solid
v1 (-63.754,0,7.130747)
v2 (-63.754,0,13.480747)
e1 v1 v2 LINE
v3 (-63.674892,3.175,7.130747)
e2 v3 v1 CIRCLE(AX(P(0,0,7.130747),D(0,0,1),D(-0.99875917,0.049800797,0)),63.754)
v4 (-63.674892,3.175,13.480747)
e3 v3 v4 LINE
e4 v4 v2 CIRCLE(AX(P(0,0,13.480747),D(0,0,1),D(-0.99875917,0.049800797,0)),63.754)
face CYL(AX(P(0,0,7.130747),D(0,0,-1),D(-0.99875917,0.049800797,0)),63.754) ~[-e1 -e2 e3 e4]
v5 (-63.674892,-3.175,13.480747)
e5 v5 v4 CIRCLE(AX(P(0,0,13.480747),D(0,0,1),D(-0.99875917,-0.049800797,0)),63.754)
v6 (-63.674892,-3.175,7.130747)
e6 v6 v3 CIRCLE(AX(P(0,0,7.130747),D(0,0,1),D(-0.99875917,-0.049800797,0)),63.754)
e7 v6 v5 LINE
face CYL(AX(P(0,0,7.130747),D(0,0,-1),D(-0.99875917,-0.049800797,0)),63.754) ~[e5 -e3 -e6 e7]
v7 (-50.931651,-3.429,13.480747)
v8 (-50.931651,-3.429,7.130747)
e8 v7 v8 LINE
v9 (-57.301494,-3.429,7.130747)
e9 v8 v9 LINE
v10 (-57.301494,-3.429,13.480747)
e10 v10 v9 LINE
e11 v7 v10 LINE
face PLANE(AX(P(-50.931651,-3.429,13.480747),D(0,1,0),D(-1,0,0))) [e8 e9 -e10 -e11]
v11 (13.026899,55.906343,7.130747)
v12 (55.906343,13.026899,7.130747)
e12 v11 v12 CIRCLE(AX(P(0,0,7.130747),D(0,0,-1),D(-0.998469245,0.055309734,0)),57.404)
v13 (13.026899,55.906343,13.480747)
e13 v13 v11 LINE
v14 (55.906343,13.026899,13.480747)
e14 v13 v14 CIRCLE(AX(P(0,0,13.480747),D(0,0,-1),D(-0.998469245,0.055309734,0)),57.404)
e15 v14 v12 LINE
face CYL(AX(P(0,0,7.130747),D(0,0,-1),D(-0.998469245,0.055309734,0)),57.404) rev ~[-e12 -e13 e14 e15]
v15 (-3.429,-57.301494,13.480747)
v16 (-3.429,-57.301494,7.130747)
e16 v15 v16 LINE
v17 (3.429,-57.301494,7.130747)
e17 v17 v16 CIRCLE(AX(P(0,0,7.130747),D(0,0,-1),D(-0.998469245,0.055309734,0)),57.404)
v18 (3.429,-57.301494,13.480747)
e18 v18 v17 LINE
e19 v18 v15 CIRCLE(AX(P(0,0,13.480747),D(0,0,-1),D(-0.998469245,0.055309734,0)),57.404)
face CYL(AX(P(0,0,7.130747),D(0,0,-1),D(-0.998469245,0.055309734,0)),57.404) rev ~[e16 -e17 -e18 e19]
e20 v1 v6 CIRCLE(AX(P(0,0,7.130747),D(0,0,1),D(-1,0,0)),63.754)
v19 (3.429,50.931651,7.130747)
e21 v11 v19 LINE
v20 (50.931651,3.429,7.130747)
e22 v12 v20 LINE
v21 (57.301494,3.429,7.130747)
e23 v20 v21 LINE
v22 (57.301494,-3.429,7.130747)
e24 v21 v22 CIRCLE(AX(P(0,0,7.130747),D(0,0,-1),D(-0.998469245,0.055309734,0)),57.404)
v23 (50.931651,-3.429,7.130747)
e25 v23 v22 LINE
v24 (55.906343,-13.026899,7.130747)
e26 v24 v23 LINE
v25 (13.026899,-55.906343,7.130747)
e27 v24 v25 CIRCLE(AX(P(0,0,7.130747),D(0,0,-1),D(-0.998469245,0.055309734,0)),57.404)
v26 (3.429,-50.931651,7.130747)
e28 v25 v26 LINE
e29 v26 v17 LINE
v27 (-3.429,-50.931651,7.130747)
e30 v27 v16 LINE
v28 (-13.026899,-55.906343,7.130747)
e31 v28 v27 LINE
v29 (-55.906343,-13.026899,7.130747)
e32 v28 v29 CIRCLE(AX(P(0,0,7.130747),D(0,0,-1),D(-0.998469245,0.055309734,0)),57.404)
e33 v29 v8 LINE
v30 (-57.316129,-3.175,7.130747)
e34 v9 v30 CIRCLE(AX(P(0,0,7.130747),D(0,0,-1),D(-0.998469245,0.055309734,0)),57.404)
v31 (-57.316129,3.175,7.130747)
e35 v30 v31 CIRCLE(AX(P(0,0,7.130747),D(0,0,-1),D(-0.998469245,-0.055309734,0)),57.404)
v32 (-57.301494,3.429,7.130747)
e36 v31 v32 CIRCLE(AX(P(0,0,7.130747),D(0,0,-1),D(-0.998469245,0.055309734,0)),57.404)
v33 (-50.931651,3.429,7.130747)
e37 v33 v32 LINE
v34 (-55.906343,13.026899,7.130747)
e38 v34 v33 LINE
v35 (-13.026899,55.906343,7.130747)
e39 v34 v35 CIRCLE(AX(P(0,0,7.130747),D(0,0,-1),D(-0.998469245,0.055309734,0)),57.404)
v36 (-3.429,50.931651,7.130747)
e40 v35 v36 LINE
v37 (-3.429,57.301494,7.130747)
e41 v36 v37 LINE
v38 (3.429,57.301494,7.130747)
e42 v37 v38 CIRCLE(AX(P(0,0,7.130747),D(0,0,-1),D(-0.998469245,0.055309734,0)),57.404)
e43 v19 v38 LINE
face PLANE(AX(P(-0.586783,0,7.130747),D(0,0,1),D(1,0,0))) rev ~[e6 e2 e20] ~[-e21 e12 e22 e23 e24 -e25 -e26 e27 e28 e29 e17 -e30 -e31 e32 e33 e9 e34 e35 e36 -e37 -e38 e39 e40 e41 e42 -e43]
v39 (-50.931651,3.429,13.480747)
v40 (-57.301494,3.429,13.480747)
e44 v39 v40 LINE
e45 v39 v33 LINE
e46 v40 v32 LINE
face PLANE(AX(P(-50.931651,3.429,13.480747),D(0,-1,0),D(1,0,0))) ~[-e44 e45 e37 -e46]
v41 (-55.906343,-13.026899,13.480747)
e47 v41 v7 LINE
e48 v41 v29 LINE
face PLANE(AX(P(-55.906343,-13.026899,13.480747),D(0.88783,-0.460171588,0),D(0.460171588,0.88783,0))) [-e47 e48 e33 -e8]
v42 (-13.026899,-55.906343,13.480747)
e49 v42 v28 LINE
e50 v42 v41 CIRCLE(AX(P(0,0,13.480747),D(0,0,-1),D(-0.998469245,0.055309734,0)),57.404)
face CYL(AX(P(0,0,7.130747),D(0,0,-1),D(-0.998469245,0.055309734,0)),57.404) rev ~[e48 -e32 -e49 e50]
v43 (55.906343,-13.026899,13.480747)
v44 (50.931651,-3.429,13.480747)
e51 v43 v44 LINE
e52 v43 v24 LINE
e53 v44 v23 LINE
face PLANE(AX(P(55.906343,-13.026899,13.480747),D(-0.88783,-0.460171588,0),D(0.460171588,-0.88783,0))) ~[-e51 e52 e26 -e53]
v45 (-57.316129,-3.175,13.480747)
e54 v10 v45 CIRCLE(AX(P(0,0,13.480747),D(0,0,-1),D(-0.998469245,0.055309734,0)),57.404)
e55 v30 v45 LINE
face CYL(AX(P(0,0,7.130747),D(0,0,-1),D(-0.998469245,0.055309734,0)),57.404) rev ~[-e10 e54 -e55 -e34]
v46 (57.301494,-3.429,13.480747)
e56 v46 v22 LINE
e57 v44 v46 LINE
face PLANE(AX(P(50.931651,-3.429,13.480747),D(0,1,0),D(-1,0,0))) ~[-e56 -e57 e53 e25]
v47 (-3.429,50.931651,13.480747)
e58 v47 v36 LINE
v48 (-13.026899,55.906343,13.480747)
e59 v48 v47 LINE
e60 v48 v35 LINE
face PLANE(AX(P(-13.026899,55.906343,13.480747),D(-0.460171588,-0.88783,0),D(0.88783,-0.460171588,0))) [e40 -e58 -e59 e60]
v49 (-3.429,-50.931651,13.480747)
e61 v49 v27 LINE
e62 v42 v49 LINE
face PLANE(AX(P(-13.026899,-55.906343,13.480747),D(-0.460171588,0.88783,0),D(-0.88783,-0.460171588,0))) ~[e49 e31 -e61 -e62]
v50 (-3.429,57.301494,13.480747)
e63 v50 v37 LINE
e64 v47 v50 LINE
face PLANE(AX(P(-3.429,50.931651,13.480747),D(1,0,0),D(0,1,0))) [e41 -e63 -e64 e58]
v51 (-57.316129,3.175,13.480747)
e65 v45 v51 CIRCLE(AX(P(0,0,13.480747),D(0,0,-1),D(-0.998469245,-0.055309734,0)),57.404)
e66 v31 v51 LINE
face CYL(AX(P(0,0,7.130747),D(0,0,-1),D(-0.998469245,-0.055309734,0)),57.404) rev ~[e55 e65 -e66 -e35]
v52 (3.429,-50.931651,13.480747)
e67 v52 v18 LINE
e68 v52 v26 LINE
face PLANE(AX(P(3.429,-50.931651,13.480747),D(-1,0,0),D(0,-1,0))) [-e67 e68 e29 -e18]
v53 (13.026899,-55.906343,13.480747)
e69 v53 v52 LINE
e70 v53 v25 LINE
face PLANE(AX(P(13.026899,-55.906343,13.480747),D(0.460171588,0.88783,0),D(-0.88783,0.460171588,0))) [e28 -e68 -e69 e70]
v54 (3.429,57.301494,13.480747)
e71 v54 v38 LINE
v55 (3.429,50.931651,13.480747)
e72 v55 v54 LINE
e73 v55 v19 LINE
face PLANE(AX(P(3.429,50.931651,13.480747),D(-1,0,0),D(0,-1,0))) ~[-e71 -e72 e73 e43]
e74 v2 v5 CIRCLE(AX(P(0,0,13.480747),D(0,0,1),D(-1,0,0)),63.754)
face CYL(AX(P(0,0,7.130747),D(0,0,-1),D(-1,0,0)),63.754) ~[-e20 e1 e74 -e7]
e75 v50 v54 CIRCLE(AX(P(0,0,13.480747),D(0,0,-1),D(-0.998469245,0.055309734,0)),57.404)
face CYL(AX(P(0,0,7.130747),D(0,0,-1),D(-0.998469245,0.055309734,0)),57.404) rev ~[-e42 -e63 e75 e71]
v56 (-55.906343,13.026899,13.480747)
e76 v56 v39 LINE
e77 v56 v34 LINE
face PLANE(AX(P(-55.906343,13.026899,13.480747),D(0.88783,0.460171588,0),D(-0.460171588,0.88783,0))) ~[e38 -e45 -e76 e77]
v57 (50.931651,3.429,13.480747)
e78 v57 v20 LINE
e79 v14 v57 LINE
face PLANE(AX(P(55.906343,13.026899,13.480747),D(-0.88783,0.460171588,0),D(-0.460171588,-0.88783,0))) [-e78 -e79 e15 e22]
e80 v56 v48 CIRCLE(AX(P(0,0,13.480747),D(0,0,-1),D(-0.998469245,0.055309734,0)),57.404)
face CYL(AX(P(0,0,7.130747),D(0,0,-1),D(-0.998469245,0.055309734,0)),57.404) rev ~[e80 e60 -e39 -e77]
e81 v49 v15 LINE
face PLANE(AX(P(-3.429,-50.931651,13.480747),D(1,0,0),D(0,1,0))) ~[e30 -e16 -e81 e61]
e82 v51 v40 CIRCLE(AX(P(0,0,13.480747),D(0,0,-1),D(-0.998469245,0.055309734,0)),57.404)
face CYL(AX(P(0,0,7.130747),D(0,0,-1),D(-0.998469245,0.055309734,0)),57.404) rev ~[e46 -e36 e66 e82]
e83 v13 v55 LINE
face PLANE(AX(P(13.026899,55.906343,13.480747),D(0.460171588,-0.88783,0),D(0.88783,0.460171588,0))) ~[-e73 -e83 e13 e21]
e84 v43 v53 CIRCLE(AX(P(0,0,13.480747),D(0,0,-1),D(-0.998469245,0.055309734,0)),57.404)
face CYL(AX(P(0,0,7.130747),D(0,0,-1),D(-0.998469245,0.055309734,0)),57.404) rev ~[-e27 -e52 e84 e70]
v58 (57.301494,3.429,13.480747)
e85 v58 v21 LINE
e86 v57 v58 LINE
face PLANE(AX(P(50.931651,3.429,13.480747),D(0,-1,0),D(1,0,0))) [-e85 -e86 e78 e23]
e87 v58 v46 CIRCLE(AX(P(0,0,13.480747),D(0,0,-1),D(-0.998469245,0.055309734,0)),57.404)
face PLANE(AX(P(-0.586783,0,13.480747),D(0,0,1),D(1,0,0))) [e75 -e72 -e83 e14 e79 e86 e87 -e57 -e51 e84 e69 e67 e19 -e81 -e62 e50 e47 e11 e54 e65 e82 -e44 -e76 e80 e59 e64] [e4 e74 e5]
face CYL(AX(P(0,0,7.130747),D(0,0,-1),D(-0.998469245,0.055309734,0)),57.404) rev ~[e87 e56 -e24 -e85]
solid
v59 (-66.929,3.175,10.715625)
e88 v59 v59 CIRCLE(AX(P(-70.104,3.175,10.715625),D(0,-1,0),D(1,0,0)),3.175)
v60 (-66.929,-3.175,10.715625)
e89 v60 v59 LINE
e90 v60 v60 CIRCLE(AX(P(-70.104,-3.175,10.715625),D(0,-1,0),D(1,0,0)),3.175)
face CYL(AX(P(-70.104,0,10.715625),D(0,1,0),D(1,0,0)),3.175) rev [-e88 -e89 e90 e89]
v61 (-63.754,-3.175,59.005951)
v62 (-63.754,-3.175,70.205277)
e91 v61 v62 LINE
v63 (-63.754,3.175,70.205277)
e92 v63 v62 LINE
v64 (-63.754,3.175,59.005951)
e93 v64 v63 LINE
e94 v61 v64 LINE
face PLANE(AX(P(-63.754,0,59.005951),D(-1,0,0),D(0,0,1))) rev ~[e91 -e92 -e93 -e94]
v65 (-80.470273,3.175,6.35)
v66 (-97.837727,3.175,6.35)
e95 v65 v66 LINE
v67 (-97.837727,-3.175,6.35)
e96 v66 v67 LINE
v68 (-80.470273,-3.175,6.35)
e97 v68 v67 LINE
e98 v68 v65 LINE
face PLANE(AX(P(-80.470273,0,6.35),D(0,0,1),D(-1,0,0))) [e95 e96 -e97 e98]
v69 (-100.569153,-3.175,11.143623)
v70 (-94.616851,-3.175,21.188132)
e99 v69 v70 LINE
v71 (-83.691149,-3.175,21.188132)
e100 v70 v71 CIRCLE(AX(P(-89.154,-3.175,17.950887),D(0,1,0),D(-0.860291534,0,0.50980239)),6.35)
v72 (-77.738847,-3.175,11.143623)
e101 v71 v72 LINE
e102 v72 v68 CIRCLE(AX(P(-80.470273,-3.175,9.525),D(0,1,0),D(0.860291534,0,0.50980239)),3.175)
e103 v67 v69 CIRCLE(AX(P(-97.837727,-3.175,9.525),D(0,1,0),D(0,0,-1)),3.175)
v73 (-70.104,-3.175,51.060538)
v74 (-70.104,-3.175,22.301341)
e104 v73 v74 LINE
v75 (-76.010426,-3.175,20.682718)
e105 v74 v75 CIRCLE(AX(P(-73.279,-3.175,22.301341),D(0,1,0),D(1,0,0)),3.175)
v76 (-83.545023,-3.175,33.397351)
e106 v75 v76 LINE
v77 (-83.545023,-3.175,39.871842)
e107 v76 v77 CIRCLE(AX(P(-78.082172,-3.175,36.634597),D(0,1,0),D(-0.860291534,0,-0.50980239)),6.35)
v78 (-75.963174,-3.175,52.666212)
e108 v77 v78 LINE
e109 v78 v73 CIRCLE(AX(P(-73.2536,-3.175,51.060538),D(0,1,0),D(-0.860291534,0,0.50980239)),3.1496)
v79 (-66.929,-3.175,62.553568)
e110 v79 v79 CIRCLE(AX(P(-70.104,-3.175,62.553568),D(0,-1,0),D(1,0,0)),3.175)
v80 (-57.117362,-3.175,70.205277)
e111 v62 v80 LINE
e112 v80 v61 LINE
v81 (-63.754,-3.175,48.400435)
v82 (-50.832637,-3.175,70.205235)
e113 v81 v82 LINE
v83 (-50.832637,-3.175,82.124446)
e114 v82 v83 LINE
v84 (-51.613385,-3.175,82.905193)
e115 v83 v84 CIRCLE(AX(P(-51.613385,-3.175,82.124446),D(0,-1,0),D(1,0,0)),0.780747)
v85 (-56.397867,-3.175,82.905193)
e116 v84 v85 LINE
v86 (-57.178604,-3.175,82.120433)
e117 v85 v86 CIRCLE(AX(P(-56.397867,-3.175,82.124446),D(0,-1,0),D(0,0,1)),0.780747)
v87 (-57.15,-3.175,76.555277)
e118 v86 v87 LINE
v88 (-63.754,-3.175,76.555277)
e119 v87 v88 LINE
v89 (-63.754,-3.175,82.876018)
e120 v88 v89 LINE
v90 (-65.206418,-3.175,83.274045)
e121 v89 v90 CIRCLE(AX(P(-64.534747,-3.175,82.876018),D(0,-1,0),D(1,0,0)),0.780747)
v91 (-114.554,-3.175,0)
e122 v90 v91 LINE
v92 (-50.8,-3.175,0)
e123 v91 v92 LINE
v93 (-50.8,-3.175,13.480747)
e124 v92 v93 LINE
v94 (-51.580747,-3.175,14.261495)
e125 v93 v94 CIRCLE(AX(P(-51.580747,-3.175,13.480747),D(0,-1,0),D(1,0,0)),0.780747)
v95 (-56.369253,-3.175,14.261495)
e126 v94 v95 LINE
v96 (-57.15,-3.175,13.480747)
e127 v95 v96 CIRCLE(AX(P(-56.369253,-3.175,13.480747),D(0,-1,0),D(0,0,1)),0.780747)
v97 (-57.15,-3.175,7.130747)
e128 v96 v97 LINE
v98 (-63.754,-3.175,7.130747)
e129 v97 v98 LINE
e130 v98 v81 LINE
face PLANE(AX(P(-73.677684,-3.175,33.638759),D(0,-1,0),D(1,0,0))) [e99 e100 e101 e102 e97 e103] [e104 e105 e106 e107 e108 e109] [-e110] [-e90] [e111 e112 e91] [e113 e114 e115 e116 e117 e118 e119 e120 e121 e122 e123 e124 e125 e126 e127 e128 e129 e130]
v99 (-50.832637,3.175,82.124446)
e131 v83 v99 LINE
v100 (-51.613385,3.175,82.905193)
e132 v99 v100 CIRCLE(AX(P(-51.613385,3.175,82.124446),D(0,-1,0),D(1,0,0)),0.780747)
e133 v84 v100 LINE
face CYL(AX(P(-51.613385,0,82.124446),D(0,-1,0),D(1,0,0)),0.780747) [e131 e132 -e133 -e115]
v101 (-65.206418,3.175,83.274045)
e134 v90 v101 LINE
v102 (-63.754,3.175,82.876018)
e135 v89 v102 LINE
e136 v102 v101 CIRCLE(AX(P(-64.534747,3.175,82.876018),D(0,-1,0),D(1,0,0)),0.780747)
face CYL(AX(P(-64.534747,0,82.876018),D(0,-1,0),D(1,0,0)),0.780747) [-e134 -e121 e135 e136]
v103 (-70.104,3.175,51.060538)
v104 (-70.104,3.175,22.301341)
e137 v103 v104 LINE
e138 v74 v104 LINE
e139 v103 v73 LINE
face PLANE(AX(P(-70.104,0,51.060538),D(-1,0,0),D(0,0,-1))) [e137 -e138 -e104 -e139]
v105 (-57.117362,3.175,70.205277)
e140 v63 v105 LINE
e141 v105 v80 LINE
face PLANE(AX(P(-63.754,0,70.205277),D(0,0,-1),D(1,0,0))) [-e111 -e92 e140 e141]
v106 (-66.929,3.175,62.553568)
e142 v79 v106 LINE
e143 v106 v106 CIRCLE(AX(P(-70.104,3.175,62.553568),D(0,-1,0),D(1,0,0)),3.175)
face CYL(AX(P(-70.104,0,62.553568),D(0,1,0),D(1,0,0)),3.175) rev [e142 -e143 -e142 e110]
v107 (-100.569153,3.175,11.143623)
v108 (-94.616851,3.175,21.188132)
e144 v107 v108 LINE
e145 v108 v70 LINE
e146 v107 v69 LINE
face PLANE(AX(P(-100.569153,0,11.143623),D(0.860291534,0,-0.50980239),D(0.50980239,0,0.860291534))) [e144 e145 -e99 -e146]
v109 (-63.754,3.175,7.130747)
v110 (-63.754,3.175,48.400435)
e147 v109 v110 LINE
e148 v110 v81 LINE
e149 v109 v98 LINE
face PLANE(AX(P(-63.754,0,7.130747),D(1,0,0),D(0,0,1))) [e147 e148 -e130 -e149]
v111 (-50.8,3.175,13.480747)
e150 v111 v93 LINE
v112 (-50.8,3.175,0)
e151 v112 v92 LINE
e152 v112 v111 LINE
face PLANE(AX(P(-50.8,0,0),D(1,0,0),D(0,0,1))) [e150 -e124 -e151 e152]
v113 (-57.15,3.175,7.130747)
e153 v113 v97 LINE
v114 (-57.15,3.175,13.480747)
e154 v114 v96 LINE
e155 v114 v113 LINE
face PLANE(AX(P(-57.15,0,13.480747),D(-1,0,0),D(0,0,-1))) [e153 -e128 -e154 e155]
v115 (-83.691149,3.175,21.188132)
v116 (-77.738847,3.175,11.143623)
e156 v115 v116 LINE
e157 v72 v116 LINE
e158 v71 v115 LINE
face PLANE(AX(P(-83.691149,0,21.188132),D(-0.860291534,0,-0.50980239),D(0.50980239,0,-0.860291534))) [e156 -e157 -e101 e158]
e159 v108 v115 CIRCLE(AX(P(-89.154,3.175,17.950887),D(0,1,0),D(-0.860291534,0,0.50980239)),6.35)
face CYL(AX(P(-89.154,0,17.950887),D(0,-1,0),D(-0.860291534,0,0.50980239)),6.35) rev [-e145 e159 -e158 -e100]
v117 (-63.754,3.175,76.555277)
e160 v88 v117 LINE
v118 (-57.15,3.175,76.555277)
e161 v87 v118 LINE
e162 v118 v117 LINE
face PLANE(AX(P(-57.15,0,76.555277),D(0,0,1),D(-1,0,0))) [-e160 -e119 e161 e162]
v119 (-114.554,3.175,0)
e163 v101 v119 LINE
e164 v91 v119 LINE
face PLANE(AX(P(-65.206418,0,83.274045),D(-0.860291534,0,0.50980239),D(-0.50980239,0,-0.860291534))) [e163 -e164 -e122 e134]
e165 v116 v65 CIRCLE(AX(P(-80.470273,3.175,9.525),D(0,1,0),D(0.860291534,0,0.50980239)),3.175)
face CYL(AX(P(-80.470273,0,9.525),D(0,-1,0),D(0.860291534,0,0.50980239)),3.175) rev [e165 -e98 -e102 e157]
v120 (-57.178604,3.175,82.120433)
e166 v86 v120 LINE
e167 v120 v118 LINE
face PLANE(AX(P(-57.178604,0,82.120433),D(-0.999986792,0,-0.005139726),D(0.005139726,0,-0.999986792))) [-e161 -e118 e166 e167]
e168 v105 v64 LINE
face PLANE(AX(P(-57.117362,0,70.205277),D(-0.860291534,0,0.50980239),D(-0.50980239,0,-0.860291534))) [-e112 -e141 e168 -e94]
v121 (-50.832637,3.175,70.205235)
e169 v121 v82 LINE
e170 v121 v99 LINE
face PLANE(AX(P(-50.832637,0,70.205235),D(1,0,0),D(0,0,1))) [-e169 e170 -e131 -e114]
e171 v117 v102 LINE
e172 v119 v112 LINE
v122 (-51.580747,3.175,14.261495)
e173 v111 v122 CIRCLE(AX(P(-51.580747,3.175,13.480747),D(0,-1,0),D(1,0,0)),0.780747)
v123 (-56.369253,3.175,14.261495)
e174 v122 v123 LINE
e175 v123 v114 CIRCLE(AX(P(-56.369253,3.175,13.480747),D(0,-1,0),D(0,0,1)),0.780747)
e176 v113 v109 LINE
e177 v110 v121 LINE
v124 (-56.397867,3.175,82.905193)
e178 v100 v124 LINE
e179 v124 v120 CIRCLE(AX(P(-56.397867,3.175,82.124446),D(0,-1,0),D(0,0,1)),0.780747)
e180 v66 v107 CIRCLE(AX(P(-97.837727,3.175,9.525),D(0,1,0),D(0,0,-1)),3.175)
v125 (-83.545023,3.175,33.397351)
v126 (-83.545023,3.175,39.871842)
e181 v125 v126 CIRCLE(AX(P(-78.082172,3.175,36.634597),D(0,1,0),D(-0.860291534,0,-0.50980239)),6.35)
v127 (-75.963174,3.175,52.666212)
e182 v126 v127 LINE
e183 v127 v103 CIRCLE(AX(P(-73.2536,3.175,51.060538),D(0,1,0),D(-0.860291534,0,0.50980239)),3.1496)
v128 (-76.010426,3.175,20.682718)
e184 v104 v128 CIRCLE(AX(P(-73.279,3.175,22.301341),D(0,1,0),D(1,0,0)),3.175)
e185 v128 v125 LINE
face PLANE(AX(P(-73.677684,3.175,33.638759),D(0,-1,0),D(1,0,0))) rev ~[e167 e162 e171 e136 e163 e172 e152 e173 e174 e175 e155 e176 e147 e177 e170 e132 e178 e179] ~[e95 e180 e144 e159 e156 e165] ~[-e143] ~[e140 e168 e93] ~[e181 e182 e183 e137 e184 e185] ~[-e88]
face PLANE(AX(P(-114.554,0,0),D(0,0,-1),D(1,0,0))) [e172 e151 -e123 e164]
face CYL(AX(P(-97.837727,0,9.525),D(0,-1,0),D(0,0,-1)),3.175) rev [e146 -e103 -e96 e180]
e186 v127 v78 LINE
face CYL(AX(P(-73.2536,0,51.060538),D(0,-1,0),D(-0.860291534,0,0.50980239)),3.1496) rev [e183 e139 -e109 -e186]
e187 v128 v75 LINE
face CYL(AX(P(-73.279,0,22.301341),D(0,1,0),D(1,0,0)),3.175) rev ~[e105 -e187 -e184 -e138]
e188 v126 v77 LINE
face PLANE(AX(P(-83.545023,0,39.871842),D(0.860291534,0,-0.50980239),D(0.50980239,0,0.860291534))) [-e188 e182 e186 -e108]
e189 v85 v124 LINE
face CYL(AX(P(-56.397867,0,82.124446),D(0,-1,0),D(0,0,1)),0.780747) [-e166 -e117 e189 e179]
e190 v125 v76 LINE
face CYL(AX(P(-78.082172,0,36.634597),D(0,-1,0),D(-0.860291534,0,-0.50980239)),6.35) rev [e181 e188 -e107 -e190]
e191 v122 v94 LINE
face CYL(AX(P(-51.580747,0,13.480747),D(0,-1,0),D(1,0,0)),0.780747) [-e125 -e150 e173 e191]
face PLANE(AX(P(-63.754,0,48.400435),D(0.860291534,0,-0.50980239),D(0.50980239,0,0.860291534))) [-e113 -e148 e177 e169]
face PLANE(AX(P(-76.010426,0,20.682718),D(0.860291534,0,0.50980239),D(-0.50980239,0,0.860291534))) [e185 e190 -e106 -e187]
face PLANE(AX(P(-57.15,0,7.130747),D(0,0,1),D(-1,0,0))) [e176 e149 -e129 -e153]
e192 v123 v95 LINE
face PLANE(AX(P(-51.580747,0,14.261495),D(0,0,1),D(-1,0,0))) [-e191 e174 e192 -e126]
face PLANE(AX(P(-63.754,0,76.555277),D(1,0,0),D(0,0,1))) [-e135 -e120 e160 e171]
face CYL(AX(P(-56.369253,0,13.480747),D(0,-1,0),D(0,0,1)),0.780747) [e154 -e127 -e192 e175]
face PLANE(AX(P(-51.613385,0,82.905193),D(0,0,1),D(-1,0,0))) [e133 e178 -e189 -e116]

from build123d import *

# Parameters (mm, degrees)
F0_R            = 3.175
F1_DEPTH        = 3.175
F3_DEPTH        = 6.35
F6_DEPTH        = 6.35
F6_COPIES_COUNT = 4


# Not quite as in the source:
# - a pattern or mirror of a feature is missing from the dataset's text; its kind, count and spacing are read off the source's solid


with BuildPart() as f1:
    # F0 (on Front) → F1 (new body, symmetric)
    with BuildSketch(Plane.XZ):
        with BuildLine():
            Line((-114.554, 0), (-63.754, 0))
            Line((-63.754, 0), (-57.15, 0))
            Line((-57.15, 0), (-50.8, 0))
            Line((-50.8, 0), (-50.8, 7.1307474974))
            Line((-50.8, 7.1307474974), (-50.8, 13.4807474974))
            ThreePointArc((-50.8, 13.4807474974), (-51.0286756476, 14.0328193472), (-51.5807474974, 14.2614949948))
            Line((-51.5807474974, 14.2614949948), (-56.3692525026, 14.2614949948))
            ThreePointArc((-56.3692525026, 14.2614949948), (-56.9213243524, 14.0328193472), (-57.15, 13.4807474974))
            Line((-57.15, 13.4807474974), (-57.15, 7.1307474974))
            Line((-57.15, 7.1307474974), (-63.754, 7.1307474974))
            Line((-63.754, 7.1307474974), (-63.754, 48.4004353356))
            Line((-63.754, 48.4004353356), (-50.832637261, 70.2052349577))
            Line((-50.832637261, 70.2052349577), (-50.832637261, 82.1244455233))
            ThreePointArc((-50.832637261, 82.1244455233), (-51.0613129086, 82.6765173731), (-51.6133847584, 82.9051930207))
            Line((-51.6133847584, 82.9051930207), (-56.3978665697, 82.9051930207))
            ThreePointArc((-56.3978665697, 82.9051930207), (-56.9513553502, 82.6750967964), (-57.1786037546, 82.120432695))
            Line((-57.1786037546, 82.120432695), (-57.15, 76.5552768946))
            Line((-57.15, 76.5552768946), (-63.754, 76.5552768946))
            Line((-63.754, 76.5552768946), (-63.754, 82.8760177533))
            ThreePointArc((-63.754, 82.8760177533), (-64.3283963131, 83.629002377), (-65.2064179593, 83.2740446937))
            Line((-65.2064179593, 83.2740446937), (-114.554, 0))
        make_face()
        with BuildLine():
            ThreePointArc((-97.837727428, 6.35), (-100.5963277724, 7.9531383205), (-100.5691530473, 11.1436225892))
            Line((-100.5691530473, 11.1436225892), (-94.6168512386, 21.1881318914))
            ThreePointArc((-94.6168512386, 21.1881318914), (-89.154, 24.300886713), (-83.6911487614, 21.1881318914))
            Line((-83.6911487614, 21.1881318914), (-77.7388469527, 11.1436225892))
            ThreePointArc((-77.7388469527, 11.1436225892), (-77.7116722276, 7.9531383205), (-80.470272572, 6.35))
            Line((-80.470272572, 6.35), (-97.837727428, 6.35))
        make_face(mode=Mode.SUBTRACT)
        with Locations((-70.104, 10.715625)):
            Circle(F0_R, mode=Mode.SUBTRACT)
        with BuildLine():
            ThreePointArc((-75.9631742143, 52.6662118698), (-72.4211622502, 54.0981405316), (-70.104, 51.0605382613))
            Line((-70.104, 51.0605382613), (-70.104, 22.3013408218))
            ThreePointArc((-70.104, 22.3013408218), (-72.4398490426, 19.2392417589), (-76.0104256193, 20.6827182325))
            Line((-76.0104256193, 20.6827182325), (-83.545023111, 33.3973514998))
            ThreePointArc((-83.545023111, 33.3973514998), (-84.4321718724, 36.6345966782), (-83.545023111, 39.8718418567))
            Line((-83.545023111, 39.8718418567), (-75.9631742143, 52.6662118698))
        make_face(mode=Mode.SUBTRACT)
        with Locations((-70.104, 62.5535683565)):
            Circle(F0_R, mode=Mode.SUBTRACT)
        Polygon((-63.754, 59.0059507892), (-63.754, 70.2052768946), (-57.1173623079, 70.2052768946), align=None, mode=Mode.SUBTRACT)
    extrude(amount=F1_DEPTH, both=True)


with BuildPart() as f3:
    # F2 (on face) → F3 (new body)
    with BuildSketch(Plane.XY.offset(7.1307474974)):
        with BuildLine():
            ThreePointArc((-63.6748921554, -3.175), (1.5879926835, -63.7342199704), (63.754, 0))
            ThreePointArc((63.754, 0), (1.5879926835, 63.7342199704), (-63.6748921554, 3.175))
            Line((-63.6748921554, 3.175), (-57.3161288542, 3.175))
            ThreePointArc((-57.3161288542, 3.175), (1.5881078673, 57.3820282426), (57.4040003121, 0))
            ThreePointArc((57.4040003121, 0), (1.5881078673, -57.3820282426), (-57.3161288542, -3.175))
            Line((-57.3161288542, -3.175), (-63.6748921554, -3.175))
        make_face()
        with BuildLine():
            Line((-57.3161288542, 3.175), (-63.6748921554, 3.175))
            ThreePointArc((-63.6748921554, 3.175), (-63.7342199704, 1.5879926835), (-63.754, 0))
            ThreePointArc((-63.754, 0), (-63.7342199704, -1.5879926835), (-63.6748921554, -3.175))
            Line((-63.6748921554, -3.175), (-57.3161288542, -3.175))
            ThreePointArc((-57.3161288542, -3.175), (-57.4040003121, 0), (-57.3161288542, 3.175))
        make_face()
    extrude(amount=F3_DEPTH)

    # F5 (on face) → F6 (join, through all)
    with BuildSketch(Plane.XY.offset(13.4807474974)):
        with BuildLine():
            Line((-50.9316508603, -3.429), (-57.3014939668, -3.429))
            ThreePointArc((-57.3014939668, -3.429), (-56.806984466, -8.2574673909), (-55.9063426191, -13.0268993544))
            Line((-55.9063426191, -13.0268993544), (-50.9316508603, -3.429))
        make_face()
    f6 = extrude(amount=-F6_DEPTH)

    # F6_copies: F6 ×4 about axis
    f6_copies_axis = Axis((0, 0, 0), (0, 0, 1))
    for i in range(1, F6_COPIES_COUNT):
        add(f6.rotate(f6_copies_axis, i * 360 / F6_COPIES_COUNT))

    # F6_copies1: F6 across plane
    add(f6.mirror(Plane(origin=(0, 0, 0), x_dir=(0, 0, 1), z_dir=(1, 0, 0))))

    # F6_copies2: F6 across plane
    add(f6.mirror(Plane(origin=(0, 0, 0), x_dir=(-0.7071067812, -0.7071067812, 0), z_dir=(0.7071067812, -0.7071067812, 0))))

    # F6_copies3: F6 across plane
    add(f6.mirror(Plane(origin=(0, 0, 0), x_dir=(0.7071067812, -0.7071067812, 0), z_dir=(0.7071067812, 0.7071067812, 0))))

    # F6_copies4: F6 across plane
    add(f6.mirror(Plane.ZX))


solid = Compound([f1.part, f3.part])
